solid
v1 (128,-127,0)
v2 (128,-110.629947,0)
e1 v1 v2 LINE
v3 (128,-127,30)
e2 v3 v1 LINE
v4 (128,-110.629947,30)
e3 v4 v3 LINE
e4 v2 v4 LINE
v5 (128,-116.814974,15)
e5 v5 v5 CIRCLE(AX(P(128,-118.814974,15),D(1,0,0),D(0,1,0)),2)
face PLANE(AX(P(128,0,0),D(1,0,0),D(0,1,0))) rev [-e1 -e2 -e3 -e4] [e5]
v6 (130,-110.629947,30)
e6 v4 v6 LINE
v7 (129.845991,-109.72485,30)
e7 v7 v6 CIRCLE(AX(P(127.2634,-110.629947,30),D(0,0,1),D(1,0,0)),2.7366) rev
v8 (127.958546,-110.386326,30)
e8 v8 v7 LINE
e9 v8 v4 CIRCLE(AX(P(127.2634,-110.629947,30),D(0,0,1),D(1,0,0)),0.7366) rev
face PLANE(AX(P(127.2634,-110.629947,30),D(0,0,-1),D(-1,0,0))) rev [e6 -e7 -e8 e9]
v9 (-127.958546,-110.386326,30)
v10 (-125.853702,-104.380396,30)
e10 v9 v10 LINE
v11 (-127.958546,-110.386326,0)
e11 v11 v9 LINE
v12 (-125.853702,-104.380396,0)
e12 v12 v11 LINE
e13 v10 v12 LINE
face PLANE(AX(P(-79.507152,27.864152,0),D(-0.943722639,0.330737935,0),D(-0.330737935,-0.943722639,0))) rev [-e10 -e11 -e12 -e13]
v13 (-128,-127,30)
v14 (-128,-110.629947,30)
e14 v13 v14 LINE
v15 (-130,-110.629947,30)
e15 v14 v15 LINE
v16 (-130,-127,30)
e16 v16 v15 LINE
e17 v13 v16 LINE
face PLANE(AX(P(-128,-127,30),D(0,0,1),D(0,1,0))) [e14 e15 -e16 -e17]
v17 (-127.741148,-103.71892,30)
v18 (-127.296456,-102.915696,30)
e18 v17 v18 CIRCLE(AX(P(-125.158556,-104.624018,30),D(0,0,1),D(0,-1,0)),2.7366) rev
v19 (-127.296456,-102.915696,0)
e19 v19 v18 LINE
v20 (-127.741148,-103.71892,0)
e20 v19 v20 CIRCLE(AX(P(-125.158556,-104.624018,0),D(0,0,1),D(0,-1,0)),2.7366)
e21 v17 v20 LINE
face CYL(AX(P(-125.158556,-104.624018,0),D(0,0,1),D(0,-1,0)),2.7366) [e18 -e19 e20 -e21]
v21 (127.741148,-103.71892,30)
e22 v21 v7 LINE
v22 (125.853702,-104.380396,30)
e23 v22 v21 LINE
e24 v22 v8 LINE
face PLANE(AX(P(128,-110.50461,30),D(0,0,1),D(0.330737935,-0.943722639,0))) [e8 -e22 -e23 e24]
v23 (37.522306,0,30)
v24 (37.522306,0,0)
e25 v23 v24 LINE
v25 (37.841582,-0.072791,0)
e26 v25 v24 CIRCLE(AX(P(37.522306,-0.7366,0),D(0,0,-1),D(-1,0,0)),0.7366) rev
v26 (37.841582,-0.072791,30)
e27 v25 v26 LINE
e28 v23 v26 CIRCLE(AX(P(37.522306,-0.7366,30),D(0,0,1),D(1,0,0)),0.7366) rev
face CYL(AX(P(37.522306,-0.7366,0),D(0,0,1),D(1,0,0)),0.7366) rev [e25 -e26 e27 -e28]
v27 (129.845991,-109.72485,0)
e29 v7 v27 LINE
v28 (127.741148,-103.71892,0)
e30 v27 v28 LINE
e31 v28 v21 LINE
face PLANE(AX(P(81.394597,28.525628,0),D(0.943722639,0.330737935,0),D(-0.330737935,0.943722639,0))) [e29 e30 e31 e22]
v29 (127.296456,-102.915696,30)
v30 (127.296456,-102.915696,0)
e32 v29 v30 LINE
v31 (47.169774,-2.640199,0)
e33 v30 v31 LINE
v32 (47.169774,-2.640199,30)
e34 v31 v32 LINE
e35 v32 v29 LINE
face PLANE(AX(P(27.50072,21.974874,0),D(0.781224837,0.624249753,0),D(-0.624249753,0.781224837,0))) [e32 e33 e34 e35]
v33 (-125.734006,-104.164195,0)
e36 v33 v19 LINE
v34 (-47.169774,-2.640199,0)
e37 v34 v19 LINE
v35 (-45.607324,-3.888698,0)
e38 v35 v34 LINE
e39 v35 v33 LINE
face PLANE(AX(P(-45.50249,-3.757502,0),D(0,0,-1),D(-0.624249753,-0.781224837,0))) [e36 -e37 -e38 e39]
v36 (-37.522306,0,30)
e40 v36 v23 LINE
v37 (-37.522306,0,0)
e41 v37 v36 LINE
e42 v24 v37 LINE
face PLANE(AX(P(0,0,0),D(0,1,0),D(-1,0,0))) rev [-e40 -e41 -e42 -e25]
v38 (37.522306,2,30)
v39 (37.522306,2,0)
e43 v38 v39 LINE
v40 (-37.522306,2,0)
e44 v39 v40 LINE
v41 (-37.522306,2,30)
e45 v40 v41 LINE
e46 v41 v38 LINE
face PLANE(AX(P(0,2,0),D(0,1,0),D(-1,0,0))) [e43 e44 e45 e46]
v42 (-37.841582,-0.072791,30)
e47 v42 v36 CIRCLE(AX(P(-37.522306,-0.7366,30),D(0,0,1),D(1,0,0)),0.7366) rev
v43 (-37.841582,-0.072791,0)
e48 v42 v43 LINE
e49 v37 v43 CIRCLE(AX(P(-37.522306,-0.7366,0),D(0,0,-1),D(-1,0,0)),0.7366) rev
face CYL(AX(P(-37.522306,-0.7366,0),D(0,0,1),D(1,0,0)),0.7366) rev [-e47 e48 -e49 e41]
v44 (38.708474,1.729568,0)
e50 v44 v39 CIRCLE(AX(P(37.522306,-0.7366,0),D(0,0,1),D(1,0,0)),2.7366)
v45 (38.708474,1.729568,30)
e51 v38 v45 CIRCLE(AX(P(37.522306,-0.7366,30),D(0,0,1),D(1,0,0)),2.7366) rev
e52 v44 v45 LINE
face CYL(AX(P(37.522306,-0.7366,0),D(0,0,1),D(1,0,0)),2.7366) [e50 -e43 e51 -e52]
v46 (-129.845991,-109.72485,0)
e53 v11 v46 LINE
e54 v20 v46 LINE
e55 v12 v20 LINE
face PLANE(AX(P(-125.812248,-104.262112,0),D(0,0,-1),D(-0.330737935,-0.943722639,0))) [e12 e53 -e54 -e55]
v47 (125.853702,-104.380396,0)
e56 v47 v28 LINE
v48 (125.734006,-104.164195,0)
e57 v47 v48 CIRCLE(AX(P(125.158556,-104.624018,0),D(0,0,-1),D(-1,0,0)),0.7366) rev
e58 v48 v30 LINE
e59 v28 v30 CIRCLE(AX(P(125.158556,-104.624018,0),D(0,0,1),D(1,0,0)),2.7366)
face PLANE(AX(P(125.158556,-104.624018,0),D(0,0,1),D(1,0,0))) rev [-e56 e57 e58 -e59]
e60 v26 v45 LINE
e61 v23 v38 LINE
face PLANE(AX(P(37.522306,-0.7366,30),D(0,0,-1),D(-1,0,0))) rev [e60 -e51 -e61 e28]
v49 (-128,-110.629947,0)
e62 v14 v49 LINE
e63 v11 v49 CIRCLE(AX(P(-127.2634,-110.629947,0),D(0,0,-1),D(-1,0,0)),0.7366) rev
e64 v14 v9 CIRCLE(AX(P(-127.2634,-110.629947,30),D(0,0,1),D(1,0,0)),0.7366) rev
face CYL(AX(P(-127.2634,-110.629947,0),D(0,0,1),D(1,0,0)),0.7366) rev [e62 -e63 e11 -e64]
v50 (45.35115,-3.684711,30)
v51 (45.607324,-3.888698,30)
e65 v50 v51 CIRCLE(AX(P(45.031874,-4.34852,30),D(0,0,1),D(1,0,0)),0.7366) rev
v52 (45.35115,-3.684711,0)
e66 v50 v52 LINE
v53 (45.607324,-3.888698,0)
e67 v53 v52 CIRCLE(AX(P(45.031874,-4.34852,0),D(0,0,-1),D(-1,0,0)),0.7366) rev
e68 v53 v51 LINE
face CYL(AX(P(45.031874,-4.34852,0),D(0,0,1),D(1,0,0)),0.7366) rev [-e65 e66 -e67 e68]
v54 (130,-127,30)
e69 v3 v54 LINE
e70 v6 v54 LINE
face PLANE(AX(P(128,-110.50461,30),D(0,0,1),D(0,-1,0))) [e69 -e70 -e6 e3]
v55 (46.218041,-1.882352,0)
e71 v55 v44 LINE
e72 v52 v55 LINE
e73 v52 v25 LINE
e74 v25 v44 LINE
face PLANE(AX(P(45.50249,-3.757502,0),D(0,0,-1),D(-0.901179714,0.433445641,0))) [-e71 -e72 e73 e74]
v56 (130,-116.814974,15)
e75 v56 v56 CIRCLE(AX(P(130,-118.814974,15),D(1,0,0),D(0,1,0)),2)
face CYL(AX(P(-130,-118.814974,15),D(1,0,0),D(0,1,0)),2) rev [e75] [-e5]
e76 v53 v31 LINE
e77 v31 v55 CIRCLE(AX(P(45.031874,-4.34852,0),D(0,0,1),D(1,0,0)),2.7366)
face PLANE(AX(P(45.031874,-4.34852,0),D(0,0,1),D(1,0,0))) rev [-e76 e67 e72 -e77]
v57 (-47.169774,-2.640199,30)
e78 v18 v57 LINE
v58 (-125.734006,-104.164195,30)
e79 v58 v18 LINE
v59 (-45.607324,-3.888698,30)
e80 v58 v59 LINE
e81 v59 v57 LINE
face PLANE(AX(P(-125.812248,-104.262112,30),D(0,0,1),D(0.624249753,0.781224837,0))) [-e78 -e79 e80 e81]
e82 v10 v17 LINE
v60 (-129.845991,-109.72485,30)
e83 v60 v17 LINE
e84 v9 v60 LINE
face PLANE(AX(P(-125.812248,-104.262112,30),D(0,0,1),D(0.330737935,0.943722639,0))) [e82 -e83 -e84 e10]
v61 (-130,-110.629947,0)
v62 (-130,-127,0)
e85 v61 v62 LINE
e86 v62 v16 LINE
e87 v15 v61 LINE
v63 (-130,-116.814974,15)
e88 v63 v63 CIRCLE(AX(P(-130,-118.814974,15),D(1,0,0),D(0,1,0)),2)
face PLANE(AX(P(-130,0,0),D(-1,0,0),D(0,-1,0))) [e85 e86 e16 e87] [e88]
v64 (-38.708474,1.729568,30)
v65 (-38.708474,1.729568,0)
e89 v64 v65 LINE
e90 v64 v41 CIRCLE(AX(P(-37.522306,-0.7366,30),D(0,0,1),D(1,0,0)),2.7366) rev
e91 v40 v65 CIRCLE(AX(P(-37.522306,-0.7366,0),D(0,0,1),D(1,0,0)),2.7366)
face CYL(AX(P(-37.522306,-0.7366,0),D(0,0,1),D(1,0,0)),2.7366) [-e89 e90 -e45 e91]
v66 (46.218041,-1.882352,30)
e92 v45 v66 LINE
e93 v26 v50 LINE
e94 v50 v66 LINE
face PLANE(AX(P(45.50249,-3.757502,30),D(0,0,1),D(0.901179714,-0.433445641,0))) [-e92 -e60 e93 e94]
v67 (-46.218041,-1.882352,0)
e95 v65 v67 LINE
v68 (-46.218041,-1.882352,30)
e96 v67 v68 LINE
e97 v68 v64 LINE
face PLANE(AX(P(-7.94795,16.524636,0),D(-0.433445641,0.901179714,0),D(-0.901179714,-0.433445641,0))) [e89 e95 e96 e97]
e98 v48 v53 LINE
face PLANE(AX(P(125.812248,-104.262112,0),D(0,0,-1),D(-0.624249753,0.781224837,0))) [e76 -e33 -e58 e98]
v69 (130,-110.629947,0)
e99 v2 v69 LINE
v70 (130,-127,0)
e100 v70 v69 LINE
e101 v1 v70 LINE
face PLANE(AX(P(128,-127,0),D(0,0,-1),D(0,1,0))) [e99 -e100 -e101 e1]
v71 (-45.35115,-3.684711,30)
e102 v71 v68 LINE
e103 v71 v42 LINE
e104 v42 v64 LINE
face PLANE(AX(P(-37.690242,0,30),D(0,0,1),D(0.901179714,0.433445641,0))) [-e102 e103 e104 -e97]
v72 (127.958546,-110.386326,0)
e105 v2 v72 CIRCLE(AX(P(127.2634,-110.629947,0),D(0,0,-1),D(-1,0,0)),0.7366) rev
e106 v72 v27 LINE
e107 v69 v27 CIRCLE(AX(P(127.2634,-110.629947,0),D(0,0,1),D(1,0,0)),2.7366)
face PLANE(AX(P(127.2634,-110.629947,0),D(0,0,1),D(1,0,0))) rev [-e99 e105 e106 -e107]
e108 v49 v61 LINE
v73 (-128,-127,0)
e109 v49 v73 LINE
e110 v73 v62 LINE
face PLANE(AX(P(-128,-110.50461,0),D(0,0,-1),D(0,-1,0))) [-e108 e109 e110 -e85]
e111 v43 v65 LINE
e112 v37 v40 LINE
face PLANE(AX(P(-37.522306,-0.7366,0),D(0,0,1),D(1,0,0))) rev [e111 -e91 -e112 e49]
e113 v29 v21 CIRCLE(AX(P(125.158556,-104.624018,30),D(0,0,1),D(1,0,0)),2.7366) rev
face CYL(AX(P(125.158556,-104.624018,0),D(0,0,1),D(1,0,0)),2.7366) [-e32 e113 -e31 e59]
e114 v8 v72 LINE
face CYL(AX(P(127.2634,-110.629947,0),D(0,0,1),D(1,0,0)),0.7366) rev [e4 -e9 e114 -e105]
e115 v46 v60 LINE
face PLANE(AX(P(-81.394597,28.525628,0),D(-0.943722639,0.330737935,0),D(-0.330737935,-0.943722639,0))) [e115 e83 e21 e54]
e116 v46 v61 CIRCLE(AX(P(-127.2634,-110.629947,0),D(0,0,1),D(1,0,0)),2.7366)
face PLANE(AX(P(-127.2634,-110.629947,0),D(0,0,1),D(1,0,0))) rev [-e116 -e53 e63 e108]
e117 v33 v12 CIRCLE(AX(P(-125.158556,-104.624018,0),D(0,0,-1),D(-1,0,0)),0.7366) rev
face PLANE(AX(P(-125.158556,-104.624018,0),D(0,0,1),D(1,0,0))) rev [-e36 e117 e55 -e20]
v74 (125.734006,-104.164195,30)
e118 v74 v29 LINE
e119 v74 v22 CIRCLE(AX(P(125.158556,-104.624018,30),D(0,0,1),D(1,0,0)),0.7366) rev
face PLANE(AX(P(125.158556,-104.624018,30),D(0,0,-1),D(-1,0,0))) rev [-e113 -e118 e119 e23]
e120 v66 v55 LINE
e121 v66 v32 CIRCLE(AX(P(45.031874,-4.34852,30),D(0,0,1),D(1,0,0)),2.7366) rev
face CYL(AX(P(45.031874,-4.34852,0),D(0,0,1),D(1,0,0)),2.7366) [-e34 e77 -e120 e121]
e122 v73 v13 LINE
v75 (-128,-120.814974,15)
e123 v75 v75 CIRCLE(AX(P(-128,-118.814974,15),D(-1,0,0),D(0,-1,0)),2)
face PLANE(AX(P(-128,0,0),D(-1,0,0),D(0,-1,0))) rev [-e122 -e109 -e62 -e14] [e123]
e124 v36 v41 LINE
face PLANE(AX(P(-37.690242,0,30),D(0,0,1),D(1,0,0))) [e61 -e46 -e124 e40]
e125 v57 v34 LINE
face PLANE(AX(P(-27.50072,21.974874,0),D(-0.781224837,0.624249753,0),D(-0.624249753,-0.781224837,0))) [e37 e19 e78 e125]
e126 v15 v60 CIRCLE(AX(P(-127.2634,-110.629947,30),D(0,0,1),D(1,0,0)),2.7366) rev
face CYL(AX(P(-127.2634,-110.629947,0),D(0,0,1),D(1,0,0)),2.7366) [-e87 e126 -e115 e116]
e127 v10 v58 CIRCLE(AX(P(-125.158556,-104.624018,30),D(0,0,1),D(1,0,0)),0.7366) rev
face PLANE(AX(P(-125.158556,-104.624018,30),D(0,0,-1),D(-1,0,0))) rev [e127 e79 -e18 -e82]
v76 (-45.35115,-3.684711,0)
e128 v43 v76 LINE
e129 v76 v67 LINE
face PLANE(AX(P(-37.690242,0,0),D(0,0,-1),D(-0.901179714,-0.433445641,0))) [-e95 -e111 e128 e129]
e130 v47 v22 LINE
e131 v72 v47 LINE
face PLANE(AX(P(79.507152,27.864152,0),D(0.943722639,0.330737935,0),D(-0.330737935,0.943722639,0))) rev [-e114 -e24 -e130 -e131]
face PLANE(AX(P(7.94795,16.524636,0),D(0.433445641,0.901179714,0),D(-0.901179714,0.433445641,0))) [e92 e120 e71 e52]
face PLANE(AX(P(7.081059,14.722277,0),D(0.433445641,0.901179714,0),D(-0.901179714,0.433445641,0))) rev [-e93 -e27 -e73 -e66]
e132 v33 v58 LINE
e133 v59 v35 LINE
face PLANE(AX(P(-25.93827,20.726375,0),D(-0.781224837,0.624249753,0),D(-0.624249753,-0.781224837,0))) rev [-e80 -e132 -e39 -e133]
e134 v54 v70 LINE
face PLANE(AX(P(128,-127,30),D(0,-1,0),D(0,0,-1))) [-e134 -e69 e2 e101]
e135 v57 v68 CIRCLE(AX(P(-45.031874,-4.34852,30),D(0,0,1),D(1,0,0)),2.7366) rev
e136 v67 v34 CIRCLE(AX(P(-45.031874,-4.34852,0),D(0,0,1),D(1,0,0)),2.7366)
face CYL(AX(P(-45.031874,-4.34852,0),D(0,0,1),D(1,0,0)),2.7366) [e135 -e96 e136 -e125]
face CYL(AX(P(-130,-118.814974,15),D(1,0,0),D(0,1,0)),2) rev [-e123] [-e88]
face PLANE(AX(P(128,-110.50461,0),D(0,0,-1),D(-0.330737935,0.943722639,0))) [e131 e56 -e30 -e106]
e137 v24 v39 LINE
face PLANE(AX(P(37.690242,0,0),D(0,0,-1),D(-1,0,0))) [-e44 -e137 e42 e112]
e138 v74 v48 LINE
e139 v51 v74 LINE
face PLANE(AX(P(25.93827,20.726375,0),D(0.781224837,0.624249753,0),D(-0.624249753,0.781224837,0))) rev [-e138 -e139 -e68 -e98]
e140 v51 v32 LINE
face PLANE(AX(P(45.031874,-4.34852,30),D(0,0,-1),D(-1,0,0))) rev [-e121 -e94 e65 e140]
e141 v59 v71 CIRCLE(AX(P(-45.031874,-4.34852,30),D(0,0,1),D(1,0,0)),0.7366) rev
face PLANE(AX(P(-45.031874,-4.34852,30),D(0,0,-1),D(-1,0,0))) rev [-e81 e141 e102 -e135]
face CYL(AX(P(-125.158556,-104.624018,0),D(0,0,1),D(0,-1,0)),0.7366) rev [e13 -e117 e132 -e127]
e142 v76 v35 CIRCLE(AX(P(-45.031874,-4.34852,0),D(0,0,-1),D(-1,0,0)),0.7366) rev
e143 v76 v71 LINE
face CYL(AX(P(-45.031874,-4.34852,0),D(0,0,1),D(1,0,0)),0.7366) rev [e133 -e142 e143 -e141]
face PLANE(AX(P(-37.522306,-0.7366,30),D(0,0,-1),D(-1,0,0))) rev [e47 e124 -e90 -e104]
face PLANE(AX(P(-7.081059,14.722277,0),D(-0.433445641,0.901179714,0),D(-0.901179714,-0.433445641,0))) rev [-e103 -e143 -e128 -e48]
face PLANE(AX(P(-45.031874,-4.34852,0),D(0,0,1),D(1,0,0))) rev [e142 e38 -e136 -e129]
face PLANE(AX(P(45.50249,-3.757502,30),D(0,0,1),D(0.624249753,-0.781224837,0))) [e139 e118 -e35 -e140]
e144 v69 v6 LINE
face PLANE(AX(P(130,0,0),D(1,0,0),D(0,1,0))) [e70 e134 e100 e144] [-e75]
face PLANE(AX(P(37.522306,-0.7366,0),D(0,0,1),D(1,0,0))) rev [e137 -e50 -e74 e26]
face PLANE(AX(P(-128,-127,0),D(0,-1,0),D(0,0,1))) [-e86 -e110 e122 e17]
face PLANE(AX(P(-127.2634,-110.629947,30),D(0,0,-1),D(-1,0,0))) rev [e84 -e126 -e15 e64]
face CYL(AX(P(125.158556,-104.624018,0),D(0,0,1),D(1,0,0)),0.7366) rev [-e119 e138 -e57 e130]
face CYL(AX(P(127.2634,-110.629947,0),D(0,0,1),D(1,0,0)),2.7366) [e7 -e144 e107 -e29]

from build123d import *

# Parameters (mm, degrees)
LOFTED_BENDS1_DEPTH     = 30
CUT_EXTRUDE1_DEPTH      = 291.9106392
CUT_EXTRUDE1_DEPTH_BACK = 291.9106392
SKETCH9_R               = 2


# Read off the part's stored shape, not the designer's step: Lofted Bends1
with BuildPart() as part:
    # Lofted Bends1 outline → Lofted Bends1 (new body)
    with BuildSketch(Plane.XY):
        with BuildLine():
            Line((-130, -110.629947141), (-130, -127))
            Line((-130, -127), (-128, -127))
            Line((-128, -127), (-128, -110.629947141))
            ThreePointArc((-128, -110.629947141), (-127.989562576, -110.506385525), (-127.958546096, -110.386325578))
            Line((-127.958546096, -110.386325578), (-125.853702275, -104.380395942))
            ThreePointArc((-125.853702275, -104.380395942), (-125.802985728, -104.267240099), (-125.734006394, -104.164195136))
            Line((-125.734006394, -104.164195136), (-45.607324148, -3.888698057))
            ThreePointArc((-45.607324148, -3.888698057), (-45.490716401, -3.772288571), (-45.351149992, -3.684711448))
            Line((-45.351149992, -3.684711448), (-37.841582221, -0.072791023))
            ThreePointArc((-37.841582221, -0.072791023), (-37.686040501, -0.018428275), (-37.522306162, 0))
            Line((-37.522306162, 0), (37.522306162, 0))
            ThreePointArc((37.522306162, 0), (37.686040501, -0.018428275), (37.841582221, -0.072791023))
            Line((37.841582221, -0.072791023), (45.351149992, -3.684711448))
            ThreePointArc((45.351149992, -3.684711448), (45.490716401, -3.772288571), (45.607324148, -3.888698057))
            Line((45.607324148, -3.888698057), (125.734006394, -104.164195136))
            ThreePointArc((125.734006394, -104.164195136), (125.802985728, -104.267240099), (125.853702275, -104.380395942))
            Line((125.853702275, -104.380395942), (127.958546096, -110.386325578))
            ThreePointArc((127.958546096, -110.386325578), (127.989562576, -110.506385525), (128, -110.629947141))
            Line((128, -110.629947141), (128, -127))
            Line((128, -127), (130, -127))
            Line((130, -127), (130, -110.629947141))
            ThreePointArc((130, -110.629947141), (129.961223114, -110.170893762), (129.845991373, -109.724849709))
            Line((129.845991373, -109.724849709), (127.741147552, -103.718920072))
            ThreePointArc((127.741147552, -103.718920072), (127.55272656, -103.298525993), (127.296456068, -102.91569563))
            Line((127.296456068, -102.91569563), (47.169773822, -2.640198551))
            ThreePointArc((47.169773822, -2.640198551), (46.736555305, -2.207716608), (46.218041274, -1.88235202))
            Line((46.218041274, -1.88235202), (38.708473503, 1.729568405))
            ThreePointArc((38.708473503, 1.729568405), (38.13060835, 1.93153568), (37.522306162, 2))
            Line((37.522306162, 2), (-37.522306162, 2))
            ThreePointArc((-37.522306162, 2), (-38.13060835, 1.93153568), (-38.708473503, 1.729568405))
            Line((-38.708473503, 1.729568405), (-46.218041274, -1.88235202))
            ThreePointArc((-46.218041274, -1.88235202), (-46.736555305, -2.207716608), (-47.169773822, -2.640198551))
            Line((-47.169773822, -2.640198551), (-127.296456068, -102.91569563))
            ThreePointArc((-127.296456068, -102.91569563), (-127.55272656, -103.298525993), (-127.741147552, -103.718920072))
            Line((-127.741147552, -103.718920072), (-129.845991373, -109.724849709))
            ThreePointArc((-129.845991373, -109.724849709), (-129.961223114, -110.170893762), (-130, -110.629947141))
        make_face()
    extrude(amount=LOFTED_BENDS1_DEPTH)

    # Sketch9 → Cut-Extrude1 (cut, two sides: drawn at the far end of the back side and taken through both)
    with BuildSketch(Plane(origin=(130, 0, 0), x_dir=(0, 0, -1), z_dir=(1, 0, 0)).offset(-CUT_EXTRUDE1_DEPTH_BACK)):
        with Locations(Location((-15, -118.814973571, 0), (0, 0, 90))):
            Circle(SKETCH9_R)
    extrude(amount=CUT_EXTRUDE1_DEPTH + CUT_EXTRUDE1_DEPTH_BACK, mode=Mode.SUBTRACT)


solid = part.part
